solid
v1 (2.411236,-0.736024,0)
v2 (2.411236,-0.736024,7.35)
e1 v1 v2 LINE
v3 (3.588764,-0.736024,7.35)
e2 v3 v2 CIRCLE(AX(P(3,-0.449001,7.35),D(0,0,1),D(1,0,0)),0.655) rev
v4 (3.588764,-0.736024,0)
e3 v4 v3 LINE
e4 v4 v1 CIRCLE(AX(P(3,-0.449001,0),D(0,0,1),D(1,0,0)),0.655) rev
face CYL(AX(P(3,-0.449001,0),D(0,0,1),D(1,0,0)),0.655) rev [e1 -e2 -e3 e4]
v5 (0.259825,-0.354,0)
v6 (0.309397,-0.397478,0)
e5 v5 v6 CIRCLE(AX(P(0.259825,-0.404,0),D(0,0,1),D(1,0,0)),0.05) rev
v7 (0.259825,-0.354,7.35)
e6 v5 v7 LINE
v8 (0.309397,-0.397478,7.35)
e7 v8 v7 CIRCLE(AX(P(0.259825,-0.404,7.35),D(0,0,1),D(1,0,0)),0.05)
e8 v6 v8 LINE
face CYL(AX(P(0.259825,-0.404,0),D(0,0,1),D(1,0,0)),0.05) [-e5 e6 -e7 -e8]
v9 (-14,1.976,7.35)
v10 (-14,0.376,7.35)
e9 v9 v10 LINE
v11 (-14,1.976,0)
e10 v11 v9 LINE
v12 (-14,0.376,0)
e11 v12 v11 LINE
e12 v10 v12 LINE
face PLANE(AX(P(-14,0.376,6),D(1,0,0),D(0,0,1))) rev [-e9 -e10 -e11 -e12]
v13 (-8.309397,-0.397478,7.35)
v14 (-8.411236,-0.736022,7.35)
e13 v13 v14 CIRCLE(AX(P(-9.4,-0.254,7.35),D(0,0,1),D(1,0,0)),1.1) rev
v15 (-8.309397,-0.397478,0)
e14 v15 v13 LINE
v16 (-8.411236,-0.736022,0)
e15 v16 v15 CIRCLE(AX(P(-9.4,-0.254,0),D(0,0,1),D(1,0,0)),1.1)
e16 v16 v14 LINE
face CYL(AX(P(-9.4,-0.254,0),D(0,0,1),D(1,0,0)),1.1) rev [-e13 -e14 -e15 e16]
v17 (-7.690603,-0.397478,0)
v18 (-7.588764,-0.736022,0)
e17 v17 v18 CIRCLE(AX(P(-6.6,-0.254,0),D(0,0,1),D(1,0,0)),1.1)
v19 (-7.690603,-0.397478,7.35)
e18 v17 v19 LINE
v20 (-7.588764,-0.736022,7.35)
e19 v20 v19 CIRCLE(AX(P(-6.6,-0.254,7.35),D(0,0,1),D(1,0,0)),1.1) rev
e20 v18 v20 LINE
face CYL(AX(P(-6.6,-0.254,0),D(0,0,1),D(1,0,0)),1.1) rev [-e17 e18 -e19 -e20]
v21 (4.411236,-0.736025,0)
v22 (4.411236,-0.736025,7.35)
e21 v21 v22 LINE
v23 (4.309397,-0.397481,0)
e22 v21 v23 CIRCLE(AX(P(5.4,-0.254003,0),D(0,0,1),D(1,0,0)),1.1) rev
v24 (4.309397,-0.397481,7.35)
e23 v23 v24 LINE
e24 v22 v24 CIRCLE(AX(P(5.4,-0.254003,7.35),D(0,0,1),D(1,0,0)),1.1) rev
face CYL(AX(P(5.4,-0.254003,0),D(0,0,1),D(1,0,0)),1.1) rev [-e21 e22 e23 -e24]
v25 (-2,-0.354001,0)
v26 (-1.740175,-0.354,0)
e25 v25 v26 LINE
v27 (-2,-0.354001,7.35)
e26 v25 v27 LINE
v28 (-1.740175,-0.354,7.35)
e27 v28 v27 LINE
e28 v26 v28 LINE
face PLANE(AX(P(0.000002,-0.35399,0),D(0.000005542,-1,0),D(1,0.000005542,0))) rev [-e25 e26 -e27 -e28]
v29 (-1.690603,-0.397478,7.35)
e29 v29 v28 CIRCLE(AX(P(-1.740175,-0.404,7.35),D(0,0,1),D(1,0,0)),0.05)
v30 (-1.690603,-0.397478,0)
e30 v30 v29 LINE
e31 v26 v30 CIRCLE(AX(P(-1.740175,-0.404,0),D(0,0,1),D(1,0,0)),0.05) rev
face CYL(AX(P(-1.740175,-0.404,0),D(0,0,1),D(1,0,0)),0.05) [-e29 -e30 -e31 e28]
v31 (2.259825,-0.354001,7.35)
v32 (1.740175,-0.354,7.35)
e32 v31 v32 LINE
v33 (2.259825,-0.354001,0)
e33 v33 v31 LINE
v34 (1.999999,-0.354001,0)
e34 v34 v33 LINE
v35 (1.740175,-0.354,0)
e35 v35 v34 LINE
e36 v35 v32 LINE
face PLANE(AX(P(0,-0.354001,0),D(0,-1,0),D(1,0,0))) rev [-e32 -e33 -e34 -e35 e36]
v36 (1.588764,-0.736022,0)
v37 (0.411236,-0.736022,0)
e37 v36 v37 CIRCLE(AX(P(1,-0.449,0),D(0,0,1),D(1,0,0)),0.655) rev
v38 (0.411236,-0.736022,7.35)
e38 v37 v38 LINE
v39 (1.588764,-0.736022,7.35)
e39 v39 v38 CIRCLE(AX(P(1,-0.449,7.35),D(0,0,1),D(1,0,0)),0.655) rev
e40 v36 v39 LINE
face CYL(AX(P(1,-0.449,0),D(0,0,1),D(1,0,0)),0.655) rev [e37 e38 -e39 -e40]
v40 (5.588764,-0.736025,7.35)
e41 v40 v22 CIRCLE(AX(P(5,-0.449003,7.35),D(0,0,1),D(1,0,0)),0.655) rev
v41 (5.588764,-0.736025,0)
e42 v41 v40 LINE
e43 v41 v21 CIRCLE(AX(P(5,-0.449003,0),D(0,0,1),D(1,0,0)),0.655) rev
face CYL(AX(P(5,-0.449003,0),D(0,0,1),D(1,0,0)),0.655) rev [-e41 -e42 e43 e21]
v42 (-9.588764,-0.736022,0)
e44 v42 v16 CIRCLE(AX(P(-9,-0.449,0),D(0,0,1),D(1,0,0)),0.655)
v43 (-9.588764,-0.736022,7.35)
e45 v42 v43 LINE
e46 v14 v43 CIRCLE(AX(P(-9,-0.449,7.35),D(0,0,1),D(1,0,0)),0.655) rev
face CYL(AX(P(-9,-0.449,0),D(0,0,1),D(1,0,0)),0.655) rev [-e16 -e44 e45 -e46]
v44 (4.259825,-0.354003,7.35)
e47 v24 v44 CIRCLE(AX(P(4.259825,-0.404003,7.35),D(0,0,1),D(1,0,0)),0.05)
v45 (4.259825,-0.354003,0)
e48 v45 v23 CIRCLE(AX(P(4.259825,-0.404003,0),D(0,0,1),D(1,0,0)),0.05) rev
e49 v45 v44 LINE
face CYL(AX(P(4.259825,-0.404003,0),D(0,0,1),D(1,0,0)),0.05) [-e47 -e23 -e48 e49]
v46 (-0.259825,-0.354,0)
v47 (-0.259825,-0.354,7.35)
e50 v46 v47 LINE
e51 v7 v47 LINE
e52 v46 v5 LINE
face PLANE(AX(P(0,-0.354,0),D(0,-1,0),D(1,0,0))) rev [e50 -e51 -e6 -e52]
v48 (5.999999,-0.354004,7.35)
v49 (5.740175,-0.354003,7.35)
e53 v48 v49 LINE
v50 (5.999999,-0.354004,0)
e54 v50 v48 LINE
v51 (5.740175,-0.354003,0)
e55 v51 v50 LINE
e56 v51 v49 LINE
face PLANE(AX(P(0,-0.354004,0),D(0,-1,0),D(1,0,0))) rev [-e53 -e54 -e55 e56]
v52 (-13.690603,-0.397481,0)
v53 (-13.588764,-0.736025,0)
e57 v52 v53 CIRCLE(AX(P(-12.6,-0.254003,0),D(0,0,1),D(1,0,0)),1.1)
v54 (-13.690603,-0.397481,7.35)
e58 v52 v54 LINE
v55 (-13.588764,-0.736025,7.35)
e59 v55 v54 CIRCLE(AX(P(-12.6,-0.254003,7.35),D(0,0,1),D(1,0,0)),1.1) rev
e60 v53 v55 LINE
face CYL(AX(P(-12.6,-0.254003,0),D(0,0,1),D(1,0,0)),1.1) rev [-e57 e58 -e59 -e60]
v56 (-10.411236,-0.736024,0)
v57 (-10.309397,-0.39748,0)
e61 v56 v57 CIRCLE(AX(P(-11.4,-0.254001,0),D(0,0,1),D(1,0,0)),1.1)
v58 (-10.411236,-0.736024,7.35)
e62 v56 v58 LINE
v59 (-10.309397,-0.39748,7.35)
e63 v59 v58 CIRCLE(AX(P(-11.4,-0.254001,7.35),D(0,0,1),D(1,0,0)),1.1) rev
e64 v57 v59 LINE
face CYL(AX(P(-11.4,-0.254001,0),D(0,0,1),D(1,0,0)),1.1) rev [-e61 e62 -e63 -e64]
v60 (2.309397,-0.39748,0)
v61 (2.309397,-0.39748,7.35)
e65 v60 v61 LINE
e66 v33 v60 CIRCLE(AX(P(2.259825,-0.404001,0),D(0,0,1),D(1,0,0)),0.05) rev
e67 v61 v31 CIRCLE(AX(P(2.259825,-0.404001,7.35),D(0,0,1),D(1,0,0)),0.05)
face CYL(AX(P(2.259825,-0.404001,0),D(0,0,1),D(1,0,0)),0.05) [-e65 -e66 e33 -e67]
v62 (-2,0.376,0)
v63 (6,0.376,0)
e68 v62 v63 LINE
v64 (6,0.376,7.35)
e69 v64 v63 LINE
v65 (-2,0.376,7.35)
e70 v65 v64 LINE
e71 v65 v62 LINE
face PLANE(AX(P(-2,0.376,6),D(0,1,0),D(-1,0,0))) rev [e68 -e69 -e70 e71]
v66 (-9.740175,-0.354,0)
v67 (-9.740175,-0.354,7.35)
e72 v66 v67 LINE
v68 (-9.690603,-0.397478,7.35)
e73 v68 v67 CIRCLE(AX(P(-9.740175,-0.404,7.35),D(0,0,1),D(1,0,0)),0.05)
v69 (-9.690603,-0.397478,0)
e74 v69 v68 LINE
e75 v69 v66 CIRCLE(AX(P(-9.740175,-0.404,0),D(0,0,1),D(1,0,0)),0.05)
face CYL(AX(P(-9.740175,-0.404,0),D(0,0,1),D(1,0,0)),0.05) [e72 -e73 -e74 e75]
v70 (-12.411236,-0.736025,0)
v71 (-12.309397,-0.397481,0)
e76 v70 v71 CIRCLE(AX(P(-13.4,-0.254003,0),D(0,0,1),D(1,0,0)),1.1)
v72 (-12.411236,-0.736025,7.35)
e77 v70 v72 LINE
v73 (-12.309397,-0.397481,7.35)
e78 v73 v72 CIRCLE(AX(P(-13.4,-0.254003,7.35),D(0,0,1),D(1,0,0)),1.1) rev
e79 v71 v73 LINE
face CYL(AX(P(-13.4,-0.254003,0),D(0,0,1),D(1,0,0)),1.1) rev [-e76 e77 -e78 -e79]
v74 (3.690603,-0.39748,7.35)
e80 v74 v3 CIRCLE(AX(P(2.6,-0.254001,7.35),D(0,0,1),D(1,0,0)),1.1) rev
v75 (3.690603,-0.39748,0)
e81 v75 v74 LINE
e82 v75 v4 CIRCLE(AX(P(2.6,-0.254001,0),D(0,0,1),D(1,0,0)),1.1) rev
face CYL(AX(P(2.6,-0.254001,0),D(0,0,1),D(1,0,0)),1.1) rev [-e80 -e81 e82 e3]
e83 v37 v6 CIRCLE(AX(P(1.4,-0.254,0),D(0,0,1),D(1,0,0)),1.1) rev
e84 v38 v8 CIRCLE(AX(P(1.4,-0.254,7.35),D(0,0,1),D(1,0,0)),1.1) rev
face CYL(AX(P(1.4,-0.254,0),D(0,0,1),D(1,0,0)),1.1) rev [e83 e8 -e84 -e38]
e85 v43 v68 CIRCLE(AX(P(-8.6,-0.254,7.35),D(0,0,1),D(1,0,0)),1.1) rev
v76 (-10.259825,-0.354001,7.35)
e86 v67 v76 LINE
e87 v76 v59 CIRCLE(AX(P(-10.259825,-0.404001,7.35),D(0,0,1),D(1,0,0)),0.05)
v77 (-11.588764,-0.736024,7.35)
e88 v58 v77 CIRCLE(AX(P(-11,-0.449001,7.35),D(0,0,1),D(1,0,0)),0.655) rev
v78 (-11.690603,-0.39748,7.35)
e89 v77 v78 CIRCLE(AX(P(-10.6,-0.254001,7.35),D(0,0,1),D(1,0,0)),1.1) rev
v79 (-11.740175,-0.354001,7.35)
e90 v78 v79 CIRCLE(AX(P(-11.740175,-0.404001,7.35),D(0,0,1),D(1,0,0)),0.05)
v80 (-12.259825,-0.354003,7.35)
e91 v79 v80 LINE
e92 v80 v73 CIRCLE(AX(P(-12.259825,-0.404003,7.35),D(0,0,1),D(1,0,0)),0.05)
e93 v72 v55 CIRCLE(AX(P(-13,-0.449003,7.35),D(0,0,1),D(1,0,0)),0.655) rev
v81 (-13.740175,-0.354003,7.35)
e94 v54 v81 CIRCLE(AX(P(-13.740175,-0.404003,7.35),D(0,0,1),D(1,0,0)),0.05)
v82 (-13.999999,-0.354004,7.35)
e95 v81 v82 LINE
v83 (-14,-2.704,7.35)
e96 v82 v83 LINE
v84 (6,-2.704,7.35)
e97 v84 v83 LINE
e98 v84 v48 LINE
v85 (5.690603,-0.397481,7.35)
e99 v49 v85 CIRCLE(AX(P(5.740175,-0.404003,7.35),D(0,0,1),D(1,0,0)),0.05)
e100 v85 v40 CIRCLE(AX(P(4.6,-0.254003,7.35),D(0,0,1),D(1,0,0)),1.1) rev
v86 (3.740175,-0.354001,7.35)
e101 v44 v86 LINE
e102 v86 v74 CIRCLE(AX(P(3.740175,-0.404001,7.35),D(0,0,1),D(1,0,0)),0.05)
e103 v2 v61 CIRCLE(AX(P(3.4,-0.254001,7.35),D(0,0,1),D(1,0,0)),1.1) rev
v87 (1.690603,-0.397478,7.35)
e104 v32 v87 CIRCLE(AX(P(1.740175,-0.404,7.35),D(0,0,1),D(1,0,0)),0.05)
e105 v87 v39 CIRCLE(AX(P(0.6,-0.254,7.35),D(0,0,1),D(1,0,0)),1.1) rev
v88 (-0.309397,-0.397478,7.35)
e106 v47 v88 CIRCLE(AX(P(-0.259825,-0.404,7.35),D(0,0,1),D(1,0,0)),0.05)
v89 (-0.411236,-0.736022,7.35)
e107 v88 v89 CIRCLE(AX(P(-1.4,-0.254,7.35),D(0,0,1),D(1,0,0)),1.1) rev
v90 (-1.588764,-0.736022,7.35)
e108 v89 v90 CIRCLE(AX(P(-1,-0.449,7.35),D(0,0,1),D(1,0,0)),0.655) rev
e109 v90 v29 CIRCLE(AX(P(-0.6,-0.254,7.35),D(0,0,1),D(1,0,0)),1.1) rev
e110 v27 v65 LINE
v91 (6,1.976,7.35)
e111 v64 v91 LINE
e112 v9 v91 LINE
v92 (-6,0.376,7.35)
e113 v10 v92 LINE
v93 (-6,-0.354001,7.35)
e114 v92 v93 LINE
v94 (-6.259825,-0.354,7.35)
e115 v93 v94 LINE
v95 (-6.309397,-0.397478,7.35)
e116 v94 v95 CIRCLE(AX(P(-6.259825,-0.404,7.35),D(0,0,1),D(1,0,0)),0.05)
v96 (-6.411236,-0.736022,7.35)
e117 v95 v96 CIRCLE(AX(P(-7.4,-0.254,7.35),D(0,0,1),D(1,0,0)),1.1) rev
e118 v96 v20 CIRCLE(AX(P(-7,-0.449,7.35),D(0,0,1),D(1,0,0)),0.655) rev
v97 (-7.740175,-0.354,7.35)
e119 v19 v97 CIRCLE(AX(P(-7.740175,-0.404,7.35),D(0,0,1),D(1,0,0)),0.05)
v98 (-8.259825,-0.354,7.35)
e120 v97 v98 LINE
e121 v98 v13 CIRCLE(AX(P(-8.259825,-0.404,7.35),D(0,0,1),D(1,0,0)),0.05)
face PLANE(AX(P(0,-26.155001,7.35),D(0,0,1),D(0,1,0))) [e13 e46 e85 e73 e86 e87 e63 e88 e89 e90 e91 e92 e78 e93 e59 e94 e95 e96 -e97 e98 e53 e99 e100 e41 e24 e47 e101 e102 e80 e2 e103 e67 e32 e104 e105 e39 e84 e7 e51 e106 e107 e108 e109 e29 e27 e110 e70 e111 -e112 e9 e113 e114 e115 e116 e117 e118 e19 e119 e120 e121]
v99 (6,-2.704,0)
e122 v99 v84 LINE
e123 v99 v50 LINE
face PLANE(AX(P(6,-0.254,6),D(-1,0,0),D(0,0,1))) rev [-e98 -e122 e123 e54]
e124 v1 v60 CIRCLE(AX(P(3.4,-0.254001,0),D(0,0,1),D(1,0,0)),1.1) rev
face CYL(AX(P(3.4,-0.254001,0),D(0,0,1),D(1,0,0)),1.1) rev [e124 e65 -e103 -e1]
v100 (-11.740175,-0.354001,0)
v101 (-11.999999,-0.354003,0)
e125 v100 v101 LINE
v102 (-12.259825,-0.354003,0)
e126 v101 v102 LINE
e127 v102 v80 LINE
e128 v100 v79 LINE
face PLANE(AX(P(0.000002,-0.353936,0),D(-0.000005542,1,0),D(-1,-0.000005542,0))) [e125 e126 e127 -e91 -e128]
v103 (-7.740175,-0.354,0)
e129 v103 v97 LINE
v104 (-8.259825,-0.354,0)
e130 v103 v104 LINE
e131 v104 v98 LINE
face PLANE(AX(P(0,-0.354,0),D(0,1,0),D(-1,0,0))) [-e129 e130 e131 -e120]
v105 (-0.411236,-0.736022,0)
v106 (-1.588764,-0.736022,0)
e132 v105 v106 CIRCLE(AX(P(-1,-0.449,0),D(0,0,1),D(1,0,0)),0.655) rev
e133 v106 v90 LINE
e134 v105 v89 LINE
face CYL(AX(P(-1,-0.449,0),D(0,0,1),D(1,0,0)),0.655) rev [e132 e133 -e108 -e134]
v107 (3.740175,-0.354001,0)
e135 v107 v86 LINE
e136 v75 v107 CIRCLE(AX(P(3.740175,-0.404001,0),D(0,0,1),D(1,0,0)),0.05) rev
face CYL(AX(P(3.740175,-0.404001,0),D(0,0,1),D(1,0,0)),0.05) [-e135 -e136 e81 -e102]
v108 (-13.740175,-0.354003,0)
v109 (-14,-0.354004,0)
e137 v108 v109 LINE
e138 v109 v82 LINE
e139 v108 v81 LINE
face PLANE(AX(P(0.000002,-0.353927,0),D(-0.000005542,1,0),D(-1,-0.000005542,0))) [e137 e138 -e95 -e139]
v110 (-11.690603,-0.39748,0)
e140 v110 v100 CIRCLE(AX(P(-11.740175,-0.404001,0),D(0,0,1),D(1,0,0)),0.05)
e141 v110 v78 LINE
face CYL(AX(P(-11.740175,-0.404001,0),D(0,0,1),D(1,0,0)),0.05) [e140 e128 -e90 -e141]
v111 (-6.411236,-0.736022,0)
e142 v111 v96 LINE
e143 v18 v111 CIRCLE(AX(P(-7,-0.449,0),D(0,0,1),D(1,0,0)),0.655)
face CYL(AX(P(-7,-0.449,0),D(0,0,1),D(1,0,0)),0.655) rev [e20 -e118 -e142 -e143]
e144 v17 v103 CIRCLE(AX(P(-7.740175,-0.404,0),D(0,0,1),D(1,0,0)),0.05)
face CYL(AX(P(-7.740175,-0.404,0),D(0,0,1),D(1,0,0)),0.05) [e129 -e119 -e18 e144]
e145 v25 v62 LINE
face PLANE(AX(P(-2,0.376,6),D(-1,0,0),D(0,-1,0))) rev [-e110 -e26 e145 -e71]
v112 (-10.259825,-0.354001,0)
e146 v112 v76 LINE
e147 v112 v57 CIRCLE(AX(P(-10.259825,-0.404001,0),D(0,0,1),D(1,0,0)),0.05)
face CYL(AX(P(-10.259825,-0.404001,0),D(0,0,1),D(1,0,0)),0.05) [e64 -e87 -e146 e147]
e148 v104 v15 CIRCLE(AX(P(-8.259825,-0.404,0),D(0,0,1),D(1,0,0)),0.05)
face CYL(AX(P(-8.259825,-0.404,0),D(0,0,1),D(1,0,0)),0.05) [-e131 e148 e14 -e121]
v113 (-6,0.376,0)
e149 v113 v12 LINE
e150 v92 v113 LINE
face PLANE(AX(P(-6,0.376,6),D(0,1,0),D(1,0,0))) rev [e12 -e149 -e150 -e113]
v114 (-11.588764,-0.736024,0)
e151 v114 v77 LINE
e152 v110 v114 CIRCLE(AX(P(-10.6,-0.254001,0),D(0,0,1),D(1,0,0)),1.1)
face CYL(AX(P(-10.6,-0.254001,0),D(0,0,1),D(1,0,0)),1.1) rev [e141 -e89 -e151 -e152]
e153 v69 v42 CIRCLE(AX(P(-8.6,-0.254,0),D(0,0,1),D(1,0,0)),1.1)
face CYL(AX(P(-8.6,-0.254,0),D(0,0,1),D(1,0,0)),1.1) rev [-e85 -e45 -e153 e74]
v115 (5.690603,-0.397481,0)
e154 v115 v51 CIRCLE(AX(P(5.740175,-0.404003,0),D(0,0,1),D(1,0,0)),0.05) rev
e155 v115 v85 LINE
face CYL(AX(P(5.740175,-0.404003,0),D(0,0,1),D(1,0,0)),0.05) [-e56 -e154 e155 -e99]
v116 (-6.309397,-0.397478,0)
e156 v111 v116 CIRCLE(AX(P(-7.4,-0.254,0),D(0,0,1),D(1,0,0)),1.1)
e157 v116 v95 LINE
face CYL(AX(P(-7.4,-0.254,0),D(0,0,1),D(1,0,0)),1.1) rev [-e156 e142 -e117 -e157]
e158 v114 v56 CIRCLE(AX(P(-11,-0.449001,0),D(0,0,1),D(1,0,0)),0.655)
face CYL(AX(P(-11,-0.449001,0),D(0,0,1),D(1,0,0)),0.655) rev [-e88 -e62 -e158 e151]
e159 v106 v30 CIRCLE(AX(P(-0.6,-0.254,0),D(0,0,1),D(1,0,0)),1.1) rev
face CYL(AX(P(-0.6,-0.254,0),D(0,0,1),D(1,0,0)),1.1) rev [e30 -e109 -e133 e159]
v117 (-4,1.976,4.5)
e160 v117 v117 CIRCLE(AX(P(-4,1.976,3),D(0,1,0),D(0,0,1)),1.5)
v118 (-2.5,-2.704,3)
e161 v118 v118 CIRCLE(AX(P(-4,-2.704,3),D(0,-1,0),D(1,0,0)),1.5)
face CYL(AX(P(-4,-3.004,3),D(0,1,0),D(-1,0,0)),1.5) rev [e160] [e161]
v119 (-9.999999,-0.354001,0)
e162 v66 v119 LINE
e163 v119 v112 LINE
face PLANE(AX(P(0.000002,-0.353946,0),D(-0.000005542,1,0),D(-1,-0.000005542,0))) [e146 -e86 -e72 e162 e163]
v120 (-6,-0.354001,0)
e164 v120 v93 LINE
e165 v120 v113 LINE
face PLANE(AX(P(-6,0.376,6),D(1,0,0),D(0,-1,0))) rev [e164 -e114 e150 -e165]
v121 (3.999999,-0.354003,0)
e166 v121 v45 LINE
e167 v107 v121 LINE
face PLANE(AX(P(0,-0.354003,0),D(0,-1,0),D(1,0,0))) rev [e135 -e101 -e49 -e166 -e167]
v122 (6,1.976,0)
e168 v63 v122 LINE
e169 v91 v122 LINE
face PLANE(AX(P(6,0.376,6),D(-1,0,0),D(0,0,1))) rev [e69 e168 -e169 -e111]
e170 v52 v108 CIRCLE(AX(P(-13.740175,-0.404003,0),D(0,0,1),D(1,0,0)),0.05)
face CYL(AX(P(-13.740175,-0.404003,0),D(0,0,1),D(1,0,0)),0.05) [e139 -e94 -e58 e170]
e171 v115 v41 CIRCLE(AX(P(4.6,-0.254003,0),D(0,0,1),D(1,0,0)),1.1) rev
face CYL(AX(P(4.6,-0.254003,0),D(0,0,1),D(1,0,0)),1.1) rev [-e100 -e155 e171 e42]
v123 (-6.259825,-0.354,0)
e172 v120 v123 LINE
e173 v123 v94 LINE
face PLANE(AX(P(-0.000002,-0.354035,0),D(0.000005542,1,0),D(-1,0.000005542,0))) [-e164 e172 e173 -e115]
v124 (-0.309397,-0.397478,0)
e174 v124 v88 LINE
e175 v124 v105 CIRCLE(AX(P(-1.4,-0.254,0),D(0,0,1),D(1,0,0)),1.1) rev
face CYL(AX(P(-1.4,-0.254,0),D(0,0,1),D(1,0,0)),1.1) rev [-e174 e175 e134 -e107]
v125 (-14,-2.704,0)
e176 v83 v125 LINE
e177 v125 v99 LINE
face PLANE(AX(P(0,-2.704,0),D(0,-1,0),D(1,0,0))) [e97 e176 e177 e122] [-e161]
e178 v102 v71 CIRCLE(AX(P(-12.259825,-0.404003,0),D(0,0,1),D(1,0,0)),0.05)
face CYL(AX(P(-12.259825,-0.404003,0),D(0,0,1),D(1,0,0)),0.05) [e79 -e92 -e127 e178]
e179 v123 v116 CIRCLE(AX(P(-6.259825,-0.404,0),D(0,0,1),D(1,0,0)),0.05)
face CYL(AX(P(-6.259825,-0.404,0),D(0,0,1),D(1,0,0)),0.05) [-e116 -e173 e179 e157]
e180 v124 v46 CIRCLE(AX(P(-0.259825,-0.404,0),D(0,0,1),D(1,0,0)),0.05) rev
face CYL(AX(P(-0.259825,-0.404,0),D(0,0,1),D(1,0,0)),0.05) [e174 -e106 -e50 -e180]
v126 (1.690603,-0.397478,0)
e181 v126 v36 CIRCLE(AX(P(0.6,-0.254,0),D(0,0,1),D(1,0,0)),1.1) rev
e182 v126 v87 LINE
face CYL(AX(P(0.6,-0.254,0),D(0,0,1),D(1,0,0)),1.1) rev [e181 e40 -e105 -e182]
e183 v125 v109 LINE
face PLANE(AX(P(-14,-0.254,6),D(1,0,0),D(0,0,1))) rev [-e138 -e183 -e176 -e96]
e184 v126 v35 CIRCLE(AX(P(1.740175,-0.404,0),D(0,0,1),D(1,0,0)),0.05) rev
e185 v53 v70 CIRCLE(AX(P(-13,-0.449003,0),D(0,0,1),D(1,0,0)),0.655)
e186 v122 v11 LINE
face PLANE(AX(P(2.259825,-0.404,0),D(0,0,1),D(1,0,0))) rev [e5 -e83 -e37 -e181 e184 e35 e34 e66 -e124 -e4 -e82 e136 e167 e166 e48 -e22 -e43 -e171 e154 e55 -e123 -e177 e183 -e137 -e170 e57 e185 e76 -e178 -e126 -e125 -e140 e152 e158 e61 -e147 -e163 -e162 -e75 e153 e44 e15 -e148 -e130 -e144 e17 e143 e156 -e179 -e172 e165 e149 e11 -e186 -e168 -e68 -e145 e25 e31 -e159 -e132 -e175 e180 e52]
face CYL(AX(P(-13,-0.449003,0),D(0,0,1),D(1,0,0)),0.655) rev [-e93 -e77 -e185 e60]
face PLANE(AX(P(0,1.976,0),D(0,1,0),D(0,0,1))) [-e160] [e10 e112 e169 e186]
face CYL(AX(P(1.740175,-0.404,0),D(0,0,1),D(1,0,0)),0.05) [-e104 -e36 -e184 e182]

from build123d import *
from OCP.BRepAlgoAPI import BRepAlgoAPI_Cut
from OCP.TopTools import TopTools_ListOfShape

# Parameters (mm, degrees)
BOSS_EXTRUDE1_DEPTH     = 6
SKETCH2_R               = 1.5
CUT_EXTRUDE1_DEPTH      = 17.153773553
CUT_EXTRUDE2_START      = -6
CUT_EXTRUDE2_DEPTH      = 6
SALIENTE_EXTRUIR1_DEPTH = 1.35
CORTAR_EXTRUIR1_START   = -0.3
CROQUIS5_W              = 20
CROQUIS5_H              = 7.35
CROQUIS5_R              = 1.5
CORTAR_EXTRUIR1_DEPTH   = 0.3
CROQUIS6_W              = 20
CROQUIS6_H              = 7.35
CROQUIS6_R              = 1.5
CORTAR_EXTRUIR2_DEPTH   = 0.4


with BuildPart() as part:
    # Sketch1 → Boss-Extrude1 (new body)
    with BuildSketch(Plane.XY):
        with BuildLine():
            Line((-0.259824575, -0.254), (0, -0.254))
            Line((0, -0.254), (0.259824575, -0.254))
            ThreePointArc((0.259824575, -0.254), (0.358731646, -0.291228588), (0.408543109, -0.384434783))
            ThreePointArc((0.408543109, -0.384434783), (0.442388286, -0.542062154), (0.501123596, -0.692202247))
            ThreePointArc((0.501123596, -0.692202247), (1, -1.004), (1.498876404, -0.692202247))
            ThreePointArc((1.498876404, -0.692202247), (1.557611714, -0.542062154), (1.591456891, -0.384434783))
            ThreePointArc((1.591456891, -0.384434783), (1.641268354, -0.291228588), (1.740175425, -0.254))
            Line((1.740175425, -0.254), (2, -0.254))
            Line((2, -0.254), (2.259824575, -0.254))
            ThreePointArc((2.259824575, -0.254), (2.358731646, -0.291228588), (2.408543109, -0.384434783))
            ThreePointArc((2.408543109, -0.384434783), (2.442388286, -0.542062154), (2.501123596, -0.692202247))
            ThreePointArc((2.501123596, -0.692202247), (3, -1.004), (3.498876404, -0.692202247))
            ThreePointArc((3.498876404, -0.692202247), (3.557611714, -0.542062154), (3.591456891, -0.384434783))
            ThreePointArc((3.591456891, -0.384434783), (3.641268354, -0.291228588), (3.740175425, -0.254))
            Line((3.740175425, -0.254), (4, -0.254))
            Line((4, -0.254), (4.259824575, -0.254))
            ThreePointArc((4.259824575, -0.254), (4.358731646, -0.291228588), (4.408543109, -0.384434783))
            ThreePointArc((4.408543109, -0.384434783), (4.442388286, -0.542062154), (4.501123596, -0.692202247))
            ThreePointArc((4.501123596, -0.692202247), (5, -1.004), (5.498876404, -0.692202247))
            ThreePointArc((5.498876404, -0.692202247), (5.557611714, -0.542062154), (5.591456891, -0.384434783))
            ThreePointArc((5.591456891, -0.384434783), (5.641268354, -0.291228588), (5.740175425, -0.254))
            Line((5.740175425, -0.254), (6, -0.254))
            Line((6, -0.254), (6, -3.004))
            Line((6, -3.004), (-3.198960597, -3.004))
            Line((-3.198960597, -3.004), (-4, -3.004))
            Line((-4, -3.004), (-4, 2.376))
            Line((-4, 2.376), (6, 2.376))
            Line((6, 2.376), (6, 0.376))
            Line((6, 0.376), (-2, 0.376))
            Line((-2, 0.376), (-2, -0.254))
            Line((-2, -0.254), (-1.740175425, -0.254))
            ThreePointArc((-1.740175425, -0.254), (-1.641268354, -0.291228588), (-1.591456891, -0.384434783))
            ThreePointArc((-1.591456891, -0.384434783), (-1.557611714, -0.542062154), (-1.498876404, -0.692202247))
            ThreePointArc((-1.498876404, -0.692202247), (-1, -1.004), (-0.501123596, -0.692202247))
            ThreePointArc((-0.501123596, -0.692202247), (-0.442388286, -0.542062154), (-0.408543109, -0.384434783))
            ThreePointArc((-0.408543109, -0.384434783), (-0.358731646, -0.291228588), (-0.259824575, -0.254))
        make_face()
    extrude(amount=BOSS_EXTRUDE1_DEPTH)

    # Mirror1: part across plane


with BuildPart() as part_1:
    add(part.part)
    add(part.part.mirror(Plane(origin=(-4, 2.376, 6), x_dir=(0, 0, 1), z_dir=(1, 0, 0))))

    # Sketch2 → Cut-Extrude1 (cut, through all)
    with BuildSketch(Plane(origin=(0, 2.376, 0), x_dir=(1, 0, 0), z_dir=(0, 1, 0))):
        with Locations(Location((-4, -3, 0), (0, 0, 180))):
            Circle(SKETCH2_R)
    extrude(amount=-CUT_EXTRUDE1_DEPTH, mode=Mode.SUBTRACT)


with BuildPart() as cut_extrude2_tool:
    # Cut-Extrude2: read off the stored shape, not the designer's step
    # Cut-Extrude2 outline → Cut-Extrude2 (new body)
    with BuildSketch(Plane.XY.offset(6).offset(CUT_EXTRUDE2_START)):
        with BuildLine():
            Line((-1.740175425, -0.254), (-2, -0.254))
            Line((-2, -0.254), (-2, -0.35400144))
            Line((-2, -0.35400144), (-1.740174871, -0.354))
            ThreePointArc((-1.740174871, -0.354), (-1.707206193, -0.366409712), (-1.690602581, -0.397478261))
            ThreePointArc((-1.690602581, -0.397478261), (-1.653372886, -0.570868369), (-1.588764045, -0.736022472))
            ThreePointArc((-1.588764045, -0.736022472), (-1, -1.104), (-0.411235955, -0.736022472))
            ThreePointArc((-0.411235955, -0.736022472), (-0.346627114, -0.570868369), (-0.309397419, -0.397478261))
            ThreePointArc((-0.309397419, -0.397478261), (-0.292793599, -0.366409529), (-0.259824575, -0.354))
            Line((-0.259824575, -0.354), (0.259824575, -0.354))
            ThreePointArc((0.259824575, -0.354), (0.292793599, -0.366409529), (0.309397419, -0.397478261))
            ThreePointArc((0.309397419, -0.397478261), (0.346627114, -0.570868369), (0.411235955, -0.736022472))
            ThreePointArc((0.411235955, -0.736022472), (1, -1.104), (1.588764045, -0.736022472))
            ThreePointArc((1.588764045, -0.736022472), (1.653372886, -0.570868369), (1.690602581, -0.397478261))
            ThreePointArc((1.690602581, -0.397478261), (1.707206401, -0.366409529), (1.740175425, -0.354))
            Line((1.740175425, -0.354), (2.259824575, -0.35400144))
            ThreePointArc((2.259824575, -0.35400144), (2.292793599, -0.366410969), (2.309397419, -0.397479701))
            ThreePointArc((2.309397419, -0.397479701), (2.346627114, -0.570869809), (2.411235955, -0.736023912))
            ThreePointArc((2.411235955, -0.736023912), (3, -1.10400144), (3.588764045, -0.736023912))
            ThreePointArc((3.588764045, -0.736023912), (3.653372886, -0.570869809), (3.690602581, -0.397479701))
            ThreePointArc((3.690602581, -0.397479701), (3.707206401, -0.366410969), (3.740175425, -0.35400144))
            Line((3.740175425, -0.35400144), (4.259824575, -0.35400288))
            ThreePointArc((4.259824575, -0.35400288), (4.292793599, -0.366412409), (4.309397419, -0.397481141))
            ThreePointArc((4.309397419, -0.397481141), (4.346627114, -0.570871249), (4.411235955, -0.736025352))
            ThreePointArc((4.411235955, -0.736025352), (5, -1.10400288), (5.588764045, -0.736025352))
            ThreePointArc((5.588764045, -0.736025352), (5.653372886, -0.570871249), (5.690602581, -0.397481141))
            ThreePointArc((5.690602581, -0.397481141), (5.707206401, -0.366412409), (5.740175425, -0.35400288))
            Line((5.740175425, -0.35400288), (5.999999446, -0.35400432))
            Line((5.999999446, -0.35400432), (6, -0.254))
            Line((6, -0.254), (5.740175425, -0.254))
            ThreePointArc((5.740175425, -0.254), (5.641268354, -0.291228588), (5.591456891, -0.384434783))
            ThreePointArc((5.591456891, -0.384434783), (5.557611714, -0.542062154), (5.498876404, -0.692202247))
            ThreePointArc((5.498876404, -0.692202247), (5, -1.004), (4.501123596, -0.692202247))
            ThreePointArc((4.501123596, -0.692202247), (4.442388286, -0.542062154), (4.408543109, -0.384434783))
            ThreePointArc((4.408543109, -0.384434783), (4.358731646, -0.291228588), (4.259824575, -0.254))
            Line((4.259824575, -0.254), (3.740175425, -0.254))
            ThreePointArc((3.740175425, -0.254), (3.641268354, -0.291228588), (3.591456891, -0.384434783))
            ThreePointArc((3.591456891, -0.384434783), (3.557611714, -0.542062154), (3.498876404, -0.692202247))
            ThreePointArc((3.498876404, -0.692202247), (3, -1.004), (2.501123596, -0.692202247))
            ThreePointArc((2.501123596, -0.692202247), (2.442388286, -0.542062154), (2.408543109, -0.384434783))
            ThreePointArc((2.408543109, -0.384434783), (2.358731646, -0.291228588), (2.259824575, -0.254))
            Line((2.259824575, -0.254), (1.740175425, -0.254))
            ThreePointArc((1.740175425, -0.254), (1.641268354, -0.291228588), (1.591456891, -0.384434783))
            ThreePointArc((1.591456891, -0.384434783), (1.557611714, -0.542062154), (1.498876404, -0.692202247))
            ThreePointArc((1.498876404, -0.692202247), (1, -1.004), (0.501123596, -0.692202247))
            ThreePointArc((0.501123596, -0.692202247), (0.442388286, -0.542062154), (0.408543109, -0.384434783))
            ThreePointArc((0.408543109, -0.384434783), (0.358731646, -0.291228588), (0.259824575, -0.254))
            Line((0.259824575, -0.254), (-0.259824575, -0.254))
            ThreePointArc((-0.259824575, -0.254), (-0.358731646, -0.291228588), (-0.408543109, -0.384434783))
            ThreePointArc((-0.408543109, -0.384434783), (-0.442388286, -0.542062154), (-0.501123596, -0.692202247))
            ThreePointArc((-0.501123596, -0.692202247), (-1, -1.004), (-1.498876404, -0.692202247))
            ThreePointArc((-1.498876404, -0.692202247), (-1.557611714, -0.542062154), (-1.591456891, -0.384434783))
            ThreePointArc((-1.591456891, -0.384434783), (-1.641268354, -0.291228588), (-1.740175425, -0.254))
        make_face()
        with BuildLine():
            Line((-6.259825129, -0.354), (-6, -0.35400144))
            Line((-6, -0.35400144), (-6, -0.254))
            Line((-6, -0.254), (-6.259824575, -0.254))
            ThreePointArc((-6.259824575, -0.254), (-6.358731646, -0.291228588), (-6.408543109, -0.384434783))
            ThreePointArc((-6.408543109, -0.384434783), (-6.442388286, -0.542062154), (-6.501123596, -0.692202247))
            ThreePointArc((-6.501123596, -0.692202247), (-7, -1.004), (-7.498876404, -0.692202247))
            ThreePointArc((-7.498876404, -0.692202247), (-7.557611714, -0.542062154), (-7.591456891, -0.384434783))
            ThreePointArc((-7.591456891, -0.384434783), (-7.641268354, -0.291228588), (-7.740175425, -0.254))
            Line((-7.740175425, -0.254), (-8.259824575, -0.254))
            ThreePointArc((-8.259824575, -0.254), (-8.358731646, -0.291228588), (-8.408543109, -0.384434783))
            ThreePointArc((-8.408543109, -0.384434783), (-8.442388286, -0.542062154), (-8.501123596, -0.692202247))
            ThreePointArc((-8.501123596, -0.692202247), (-9, -1.004), (-9.498876404, -0.692202247))
            ThreePointArc((-9.498876404, -0.692202247), (-9.557611714, -0.542062154), (-9.591456891, -0.384434783))
            ThreePointArc((-9.591456891, -0.384434783), (-9.641268354, -0.291228588), (-9.740175425, -0.254))
            Line((-9.740175425, -0.254), (-10.259824575, -0.254))
            ThreePointArc((-10.259824575, -0.254), (-10.358731646, -0.291228588), (-10.408543109, -0.384434783))
            ThreePointArc((-10.408543109, -0.384434783), (-10.442388286, -0.542062154), (-10.501123596, -0.692202247))
            ThreePointArc((-10.501123596, -0.692202247), (-11, -1.004), (-11.498876404, -0.692202247))
            ThreePointArc((-11.498876404, -0.692202247), (-11.557611714, -0.542062154), (-11.591456891, -0.384434783))
            ThreePointArc((-11.591456891, -0.384434783), (-11.641268354, -0.291228588), (-11.740175425, -0.254))
            Line((-11.740175425, -0.254), (-12.259824575, -0.254))
            ThreePointArc((-12.259824575, -0.254), (-12.358731646, -0.291228588), (-12.408543109, -0.384434783))
            ThreePointArc((-12.408543109, -0.384434783), (-12.442388286, -0.542062154), (-12.501123596, -0.692202247))
            ThreePointArc((-12.501123596, -0.692202247), (-13, -1.004), (-13.498876404, -0.692202247))
            ThreePointArc((-13.498876404, -0.692202247), (-13.557611714, -0.542062154), (-13.591456891, -0.384434783))
            ThreePointArc((-13.591456891, -0.384434783), (-13.641268354, -0.291228588), (-13.740175425, -0.254))
            Line((-13.740175425, -0.254), (-14, -0.254))
            Line((-14, -0.254), (-14, -0.35400396))
            Line((-14, -0.35400396), (-13.740175425, -0.35400288))
            ThreePointArc((-13.740175425, -0.35400288), (-13.707206401, -0.366412409), (-13.690602581, -0.397481141))
            ThreePointArc((-13.690602581, -0.397481141), (-13.653372886, -0.570871249), (-13.588764045, -0.736025352))
            ThreePointArc((-13.588764045, -0.736025352), (-13, -1.10400288), (-12.411235955, -0.736025352))
            ThreePointArc((-12.411235955, -0.736025352), (-12.346627114, -0.570871249), (-12.309397419, -0.397481141))
            ThreePointArc((-12.309397419, -0.397481141), (-12.292793599, -0.366412409), (-12.259824575, -0.35400288))
            Line((-12.259824575, -0.35400288), (-11.740175425, -0.35400144))
            ThreePointArc((-11.740175425, -0.35400144), (-11.707206401, -0.366410969), (-11.690602581, -0.397479701))
            ThreePointArc((-11.690602581, -0.397479701), (-11.653372886, -0.570869809), (-11.588764045, -0.736023912))
            ThreePointArc((-11.588764045, -0.736023912), (-11, -1.10400144), (-10.411235955, -0.736023912))
            ThreePointArc((-10.411235955, -0.736023912), (-10.346627114, -0.570869809), (-10.309397419, -0.397479701))
            ThreePointArc((-10.309397419, -0.397479701), (-10.292793599, -0.366410969), (-10.259824575, -0.35400144))
            Line((-10.259824575, -0.35400144), (-9.740175425, -0.354))
            ThreePointArc((-9.740175425, -0.354), (-9.707206401, -0.366409529), (-9.690602581, -0.397478261))
            ThreePointArc((-9.690602581, -0.397478261), (-9.653372886, -0.570868369), (-9.588764045, -0.736022472))
            ThreePointArc((-9.588764045, -0.736022472), (-9, -1.104), (-8.411235955, -0.736022472))
            ThreePointArc((-8.411235955, -0.736022472), (-8.346627114, -0.570868369), (-8.309397419, -0.397478261))
            ThreePointArc((-8.309397419, -0.397478261), (-8.292793599, -0.366409529), (-8.259824575, -0.354))
            Line((-8.259824575, -0.354), (-7.740175425, -0.354))
            ThreePointArc((-7.740175425, -0.354), (-7.707206401, -0.366409529), (-7.690602581, -0.397478261))
            ThreePointArc((-7.690602581, -0.397478261), (-7.653372886, -0.570868369), (-7.588764045, -0.736022472))
            ThreePointArc((-7.588764045, -0.736022472), (-7, -1.104), (-6.411235955, -0.736022472))
            ThreePointArc((-6.411235955, -0.736022472), (-6.346627114, -0.570868369), (-6.309397419, -0.397478261))
            ThreePointArc((-6.309397419, -0.397478261), (-6.292793807, -0.366409712), (-6.259825129, -0.354))
        make_face()
    extrude(amount=CUT_EXTRUDE2_DEPTH)


with BuildPart() as part_2:
    add(part_1.part)

    # Cut-Extrude2: cut by cut_extrude2_tool, with a tolerance
    cut_extrude2_stock = TopTools_ListOfShape()
    cut_extrude2_stock.Append(part_2.part.wrapped)
    cut_extrude2_tools = TopTools_ListOfShape()
    cut_extrude2_tools.Append(cut_extrude2_tool.part.wrapped)
    cut_extrude2_cut = BRepAlgoAPI_Cut()
    cut_extrude2_cut.SetArguments(cut_extrude2_stock)
    cut_extrude2_cut.SetTools(cut_extrude2_tools)
    cut_extrude2_cut.SetFuzzyValue(0.00001)
    cut_extrude2_cut.Build()
    add(Compound.cast(cut_extrude2_cut.Shape()).solids(), mode=Mode.REPLACE)


with BuildPart() as saliente_extruir1_tool:
    # Croquis1 → Saliente-Extruir1 (new body)
    with BuildSketch(Plane.XY.offset(6)):
        with BuildLine():
            Line((-6, -0.35400144), (-6.259825129, -0.354))
            ThreePointArc((-6.259825129, -0.354), (-6.292793807, -0.366409712), (-6.309397419, -0.397478261))
            ThreePointArc((-6.309397419, -0.397478261), (-6.346627114, -0.570868369), (-6.411235955, -0.736022472))
            ThreePointArc((-6.411235955, -0.736022472), (-7, -1.104), (-7.588764045, -0.736022472))
            ThreePointArc((-7.588764045, -0.736022472), (-7.653372886, -0.570868369), (-7.690602581, -0.397478261))
            ThreePointArc((-7.690602581, -0.397478261), (-7.707206401, -0.366409529), (-7.740175425, -0.354))
            Line((-7.740175425, -0.354), (-8.259824575, -0.354))
            ThreePointArc((-8.259824575, -0.354), (-8.292793599, -0.366409529), (-8.309397419, -0.397478261))
            ThreePointArc((-8.309397419, -0.397478261), (-8.346627114, -0.570868369), (-8.411235955, -0.736022472))
            ThreePointArc((-8.411235955, -0.736022472), (-9, -1.104), (-9.588764045, -0.736022472))
            ThreePointArc((-9.588764045, -0.736022472), (-9.653372886, -0.570868369), (-9.690602581, -0.397478261))
            ThreePointArc((-9.690602581, -0.397478261), (-9.707206401, -0.366409529), (-9.740175425, -0.354))
            Line((-9.740175425, -0.354), (-9.999999446, -0.35400144))
            Line((-9.999999446, -0.35400144), (-10.259824575, -0.35400144))
            ThreePointArc((-10.259824575, -0.35400144), (-10.292793599, -0.366410969), (-10.309397419, -0.397479701))
            ThreePointArc((-10.309397419, -0.397479701), (-10.346627114, -0.570869809), (-10.411235955, -0.736023912))
            ThreePointArc((-10.411235955, -0.736023912), (-11, -1.10400144), (-11.588764045, -0.736023912))
            ThreePointArc((-11.588764045, -0.736023912), (-11.653372886, -0.570869809), (-11.690602581, -0.397479701))
            ThreePointArc((-11.690602581, -0.397479701), (-11.707206401, -0.366410969), (-11.740175425, -0.35400144))
            Line((-11.740175425, -0.35400144), (-11.999999446, -0.35400288))
            Line((-11.999999446, -0.35400288), (-12.259824575, -0.35400288))
            ThreePointArc((-12.259824575, -0.35400288), (-12.292793599, -0.366412409), (-12.309397419, -0.397481141))
            ThreePointArc((-12.309397419, -0.397481141), (-12.346627114, -0.570871249), (-12.411235955, -0.736025352))
            ThreePointArc((-12.411235955, -0.736025352), (-13, -1.10400288), (-13.588764045, -0.736025352))
            ThreePointArc((-13.588764045, -0.736025352), (-13.653372886, -0.570871249), (-13.690602581, -0.397481141))
            ThreePointArc((-13.690602581, -0.397481141), (-13.707206401, -0.366412409), (-13.740175425, -0.35400288))
            Line((-13.740175425, -0.35400288), (-13.999999446, -0.35400432))
            Line((-13.999999446, -0.35400432), (-14, -3.004))
            Line((-14, -3.004), (6, -3.004))
            Line((6, -3.004), (5.999999446, -0.35400432))
            Line((5.999999446, -0.35400432), (5.740175425, -0.35400288))
            ThreePointArc((5.740175425, -0.35400288), (5.707206401, -0.366412409), (5.690602581, -0.397481141))
            ThreePointArc((5.690602581, -0.397481141), (5.653372886, -0.570871249), (5.588764045, -0.736025352))
            ThreePointArc((5.588764045, -0.736025352), (5, -1.10400288), (4.411235955, -0.736025352))
            ThreePointArc((4.411235955, -0.736025352), (4.346627114, -0.570871249), (4.309397419, -0.397481141))
            ThreePointArc((4.309397419, -0.397481141), (4.292793599, -0.366412409), (4.259824575, -0.35400288))
            Line((4.259824575, -0.35400288), (3.999999446, -0.35400288))
            Line((3.999999446, -0.35400288), (3.740175425, -0.35400144))
            ThreePointArc((3.740175425, -0.35400144), (3.707206401, -0.366410969), (3.690602581, -0.397479701))
            ThreePointArc((3.690602581, -0.397479701), (3.653372886, -0.570869809), (3.588764045, -0.736023912))
            ThreePointArc((3.588764045, -0.736023912), (3, -1.10400144), (2.411235955, -0.736023912))
            ThreePointArc((2.411235955, -0.736023912), (2.346627114, -0.570869809), (2.309397419, -0.397479701))
            ThreePointArc((2.309397419, -0.397479701), (2.292793599, -0.366410969), (2.259824575, -0.35400144))
            Line((2.259824575, -0.35400144), (1.999999446, -0.35400144))
            Line((1.999999446, -0.35400144), (1.740175425, -0.354))
            ThreePointArc((1.740175425, -0.354), (1.707206401, -0.366409529), (1.690602581, -0.397478261))
            ThreePointArc((1.690602581, -0.397478261), (1.653372886, -0.570868369), (1.588764045, -0.736022472))
            ThreePointArc((1.588764045, -0.736022472), (1, -1.104), (0.411235955, -0.736022472))
            ThreePointArc((0.411235955, -0.736022472), (0.346627114, -0.570868369), (0.309397419, -0.397478261))
            ThreePointArc((0.309397419, -0.397478261), (0.292793599, -0.366409529), (0.259824575, -0.354))
            Line((0.259824575, -0.354), (-0.259824575, -0.354))
            ThreePointArc((-0.259824575, -0.354), (-0.292793599, -0.366409529), (-0.309397419, -0.397478261))
            ThreePointArc((-0.309397419, -0.397478261), (-0.346627114, -0.570868369), (-0.411235955, -0.736022472))
            ThreePointArc((-0.411235955, -0.736022472), (-1, -1.104), (-1.588764045, -0.736022472))
            ThreePointArc((-1.588764045, -0.736022472), (-1.653372886, -0.570868369), (-1.690602581, -0.397478261))
            ThreePointArc((-1.690602581, -0.397478261), (-1.707206193, -0.366409712), (-1.740174871, -0.354))
            Line((-1.740174871, -0.354), (-2, -0.35400144))
            Line((-2, -0.35400144), (-2, 0.376))
            Line((-2, 0.376), (6, 0.376))
            Line((6, 0.376), (6, 2.376))
            Line((6, 2.376), (-14, 2.376))
            Line((-14, 2.376), (-14, 0.376))
            Line((-14, 0.376), (-6, 0.376))
            Line((-6, 0.376), (-6, -0.35400144))
        make_face()
    extrude(amount=SALIENTE_EXTRUIR1_DEPTH)


with BuildPart() as part_3:
    add(part_2.part)


with BuildPart() as part_4:
    # Saliente-Extruir1: joined with saliente_extruir1_tool
    add(part_3.part.fuse(saliente_extruir1_tool.part, tol=0.00001))

    # Croquis5 → Cortar-Extruir1 (cut)
    with BuildSketch(Plane.XZ.offset(3.004).offset(CORTAR_EXTRUIR1_START)):
        with Locations((-4, 3.675)):
            Rectangle(CROQUIS5_W, CROQUIS5_H)
        with Locations(Location((-4, 3, 0), (0, 0, 180))):
            Circle(CROQUIS5_R, mode=Mode.SUBTRACT)
    extrude(amount=CORTAR_EXTRUIR1_DEPTH, mode=Mode.SUBTRACT)

    # Croquis6 → Cortar-Extruir2 (cut)
    with BuildSketch(Plane(origin=(0, 2.376, 0), x_dir=(1, 0, 0), z_dir=(0, 1, 0))):
        with Locations((-4, -3.675)):
            Rectangle(CROQUIS6_W, CROQUIS6_H)
        with Locations(Location((-4, -3, 0), (0, 0, 270))):
            Circle(CROQUIS6_R, mode=Mode.SUBTRACT)
    extrude(amount=-CORTAR_EXTRUIR2_DEPTH, mode=Mode.SUBTRACT)


solid = part_4.part
